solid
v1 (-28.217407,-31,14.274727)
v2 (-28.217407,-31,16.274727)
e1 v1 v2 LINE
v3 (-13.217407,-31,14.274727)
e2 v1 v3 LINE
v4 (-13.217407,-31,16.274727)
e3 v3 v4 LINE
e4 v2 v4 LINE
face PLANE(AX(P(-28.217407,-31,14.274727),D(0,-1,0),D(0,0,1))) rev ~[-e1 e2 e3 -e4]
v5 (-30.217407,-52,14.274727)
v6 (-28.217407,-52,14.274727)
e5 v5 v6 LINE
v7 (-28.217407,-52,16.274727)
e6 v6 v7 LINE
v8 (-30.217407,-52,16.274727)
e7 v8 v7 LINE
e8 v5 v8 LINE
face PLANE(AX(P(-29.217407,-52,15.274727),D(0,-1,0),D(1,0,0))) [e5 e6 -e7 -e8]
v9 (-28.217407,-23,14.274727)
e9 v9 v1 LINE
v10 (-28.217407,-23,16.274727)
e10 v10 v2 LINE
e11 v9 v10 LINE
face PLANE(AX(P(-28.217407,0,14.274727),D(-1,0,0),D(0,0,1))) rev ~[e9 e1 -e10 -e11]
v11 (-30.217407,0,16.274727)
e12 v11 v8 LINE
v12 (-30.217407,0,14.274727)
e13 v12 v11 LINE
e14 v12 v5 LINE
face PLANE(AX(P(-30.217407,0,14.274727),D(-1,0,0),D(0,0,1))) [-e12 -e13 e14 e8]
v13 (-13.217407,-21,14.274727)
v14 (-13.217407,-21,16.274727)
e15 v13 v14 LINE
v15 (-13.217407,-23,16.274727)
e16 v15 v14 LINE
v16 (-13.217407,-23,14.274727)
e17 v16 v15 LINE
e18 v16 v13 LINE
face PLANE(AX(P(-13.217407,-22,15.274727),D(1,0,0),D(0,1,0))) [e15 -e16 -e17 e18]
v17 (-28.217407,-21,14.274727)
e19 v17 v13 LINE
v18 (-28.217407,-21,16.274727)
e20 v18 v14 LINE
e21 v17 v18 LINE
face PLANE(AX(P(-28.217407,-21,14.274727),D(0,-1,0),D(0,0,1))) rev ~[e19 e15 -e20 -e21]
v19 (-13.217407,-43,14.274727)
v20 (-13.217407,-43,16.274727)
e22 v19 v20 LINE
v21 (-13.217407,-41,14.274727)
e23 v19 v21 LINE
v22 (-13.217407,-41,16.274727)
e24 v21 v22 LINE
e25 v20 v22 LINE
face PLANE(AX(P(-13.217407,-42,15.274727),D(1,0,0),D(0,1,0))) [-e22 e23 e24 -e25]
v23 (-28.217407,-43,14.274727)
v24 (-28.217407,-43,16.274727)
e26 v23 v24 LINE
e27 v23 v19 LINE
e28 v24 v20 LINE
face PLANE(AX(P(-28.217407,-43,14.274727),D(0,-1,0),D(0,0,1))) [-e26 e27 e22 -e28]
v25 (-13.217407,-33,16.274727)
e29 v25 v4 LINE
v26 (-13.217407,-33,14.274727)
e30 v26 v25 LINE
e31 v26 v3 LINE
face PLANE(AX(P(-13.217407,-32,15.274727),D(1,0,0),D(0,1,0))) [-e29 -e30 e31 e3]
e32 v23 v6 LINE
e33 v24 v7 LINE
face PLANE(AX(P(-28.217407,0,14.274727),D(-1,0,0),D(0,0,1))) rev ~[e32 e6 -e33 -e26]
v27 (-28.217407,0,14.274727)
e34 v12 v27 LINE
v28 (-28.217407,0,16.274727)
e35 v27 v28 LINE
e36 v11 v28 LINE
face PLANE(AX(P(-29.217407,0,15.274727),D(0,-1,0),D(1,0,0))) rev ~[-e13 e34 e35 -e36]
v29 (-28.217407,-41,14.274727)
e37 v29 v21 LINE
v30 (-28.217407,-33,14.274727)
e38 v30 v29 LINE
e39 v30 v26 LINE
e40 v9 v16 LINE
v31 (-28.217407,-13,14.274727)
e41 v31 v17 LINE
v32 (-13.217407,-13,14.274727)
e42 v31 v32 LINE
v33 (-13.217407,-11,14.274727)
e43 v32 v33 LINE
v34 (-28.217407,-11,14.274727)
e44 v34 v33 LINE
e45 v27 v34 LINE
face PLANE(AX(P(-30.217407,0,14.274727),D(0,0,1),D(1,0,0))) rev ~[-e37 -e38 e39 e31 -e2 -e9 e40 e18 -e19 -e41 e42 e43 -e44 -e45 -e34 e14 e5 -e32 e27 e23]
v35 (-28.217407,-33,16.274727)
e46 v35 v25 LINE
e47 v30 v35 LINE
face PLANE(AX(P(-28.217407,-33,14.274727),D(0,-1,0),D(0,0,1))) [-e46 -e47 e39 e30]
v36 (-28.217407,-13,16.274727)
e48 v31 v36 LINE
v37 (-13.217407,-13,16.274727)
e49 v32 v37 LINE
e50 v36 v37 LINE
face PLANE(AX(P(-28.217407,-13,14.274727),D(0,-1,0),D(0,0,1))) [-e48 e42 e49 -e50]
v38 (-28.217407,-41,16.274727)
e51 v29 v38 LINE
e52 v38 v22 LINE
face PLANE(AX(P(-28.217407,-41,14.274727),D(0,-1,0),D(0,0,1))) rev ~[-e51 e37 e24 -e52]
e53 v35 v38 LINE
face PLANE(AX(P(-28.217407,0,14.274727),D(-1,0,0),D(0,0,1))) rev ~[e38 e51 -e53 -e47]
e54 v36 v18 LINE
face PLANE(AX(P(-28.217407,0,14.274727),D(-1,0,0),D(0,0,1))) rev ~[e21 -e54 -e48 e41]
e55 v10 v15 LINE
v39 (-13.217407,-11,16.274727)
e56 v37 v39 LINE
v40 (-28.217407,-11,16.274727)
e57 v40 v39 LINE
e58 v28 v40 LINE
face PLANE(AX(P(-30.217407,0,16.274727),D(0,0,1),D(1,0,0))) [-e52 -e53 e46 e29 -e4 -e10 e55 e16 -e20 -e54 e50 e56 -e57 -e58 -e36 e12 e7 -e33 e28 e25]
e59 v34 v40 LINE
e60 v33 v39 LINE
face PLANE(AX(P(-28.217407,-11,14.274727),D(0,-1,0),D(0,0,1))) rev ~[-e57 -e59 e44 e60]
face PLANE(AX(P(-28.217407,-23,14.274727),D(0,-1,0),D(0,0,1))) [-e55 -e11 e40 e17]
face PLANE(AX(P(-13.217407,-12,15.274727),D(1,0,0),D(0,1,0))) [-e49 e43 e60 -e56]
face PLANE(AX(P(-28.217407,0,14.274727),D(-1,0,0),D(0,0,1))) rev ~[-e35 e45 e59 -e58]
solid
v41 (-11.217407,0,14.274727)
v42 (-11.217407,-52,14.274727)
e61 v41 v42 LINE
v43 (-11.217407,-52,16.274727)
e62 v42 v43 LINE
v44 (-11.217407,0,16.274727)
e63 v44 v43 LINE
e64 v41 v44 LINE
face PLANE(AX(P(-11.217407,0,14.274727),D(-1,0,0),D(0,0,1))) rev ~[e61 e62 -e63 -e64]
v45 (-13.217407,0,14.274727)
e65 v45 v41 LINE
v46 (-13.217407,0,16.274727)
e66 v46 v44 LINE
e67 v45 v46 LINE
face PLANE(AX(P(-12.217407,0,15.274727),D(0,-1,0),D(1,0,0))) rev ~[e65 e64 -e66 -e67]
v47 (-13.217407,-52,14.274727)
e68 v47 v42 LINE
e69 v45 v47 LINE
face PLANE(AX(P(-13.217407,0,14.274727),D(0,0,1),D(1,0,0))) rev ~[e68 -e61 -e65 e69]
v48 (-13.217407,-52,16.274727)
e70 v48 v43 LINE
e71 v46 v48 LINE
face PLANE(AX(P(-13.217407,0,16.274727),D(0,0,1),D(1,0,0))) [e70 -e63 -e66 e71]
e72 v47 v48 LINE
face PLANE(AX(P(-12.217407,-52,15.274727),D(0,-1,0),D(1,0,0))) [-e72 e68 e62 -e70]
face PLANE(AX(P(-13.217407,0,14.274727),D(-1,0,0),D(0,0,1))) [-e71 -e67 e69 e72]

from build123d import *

# Parameters (mm, degrees)
F0_W     = 2
F0_H     = 2
F1_DEPTH = 52
F2_W     = 2
F2_H     = 2
F3_DEPTH = 15


with BuildPart() as f1:
    # F0 (on Front) → F1 (new body)
    with BuildSketch(Plane.XZ):
        with Locations((-29.2174071148, 15.274727294)):
            Rectangle(F0_W, F0_H)
    extrude(amount=F1_DEPTH)

    # F2 (on face) → F3 (join)
    with BuildSketch(Plane.YZ.offset(-28.2174071148)):
        with Locations((-42, 15.274727294)):
            Rectangle(F2_W, F2_H)
        with Locations((-32, 15.274727294)):
            Rectangle(F2_W, F2_H)
        with Locations((-22, 15.274727294)):
            Rectangle(F2_W, F2_H)
        with Locations((-12, 15.274727294)):
            Rectangle(F2_W, F2_H)
    extrude(amount=F3_DEPTH)


with BuildPart() as f1b:
    # F0 (on Front) → F1, piece 2 (new body)
    with BuildSketch(Plane.XZ):
        with Locations((-12.2174071148, 15.274727294)):
            Rectangle(F0_W, F0_H)
    extrude(amount=F1_DEPTH)


solid = Compound([f1.part, f1b.part])
